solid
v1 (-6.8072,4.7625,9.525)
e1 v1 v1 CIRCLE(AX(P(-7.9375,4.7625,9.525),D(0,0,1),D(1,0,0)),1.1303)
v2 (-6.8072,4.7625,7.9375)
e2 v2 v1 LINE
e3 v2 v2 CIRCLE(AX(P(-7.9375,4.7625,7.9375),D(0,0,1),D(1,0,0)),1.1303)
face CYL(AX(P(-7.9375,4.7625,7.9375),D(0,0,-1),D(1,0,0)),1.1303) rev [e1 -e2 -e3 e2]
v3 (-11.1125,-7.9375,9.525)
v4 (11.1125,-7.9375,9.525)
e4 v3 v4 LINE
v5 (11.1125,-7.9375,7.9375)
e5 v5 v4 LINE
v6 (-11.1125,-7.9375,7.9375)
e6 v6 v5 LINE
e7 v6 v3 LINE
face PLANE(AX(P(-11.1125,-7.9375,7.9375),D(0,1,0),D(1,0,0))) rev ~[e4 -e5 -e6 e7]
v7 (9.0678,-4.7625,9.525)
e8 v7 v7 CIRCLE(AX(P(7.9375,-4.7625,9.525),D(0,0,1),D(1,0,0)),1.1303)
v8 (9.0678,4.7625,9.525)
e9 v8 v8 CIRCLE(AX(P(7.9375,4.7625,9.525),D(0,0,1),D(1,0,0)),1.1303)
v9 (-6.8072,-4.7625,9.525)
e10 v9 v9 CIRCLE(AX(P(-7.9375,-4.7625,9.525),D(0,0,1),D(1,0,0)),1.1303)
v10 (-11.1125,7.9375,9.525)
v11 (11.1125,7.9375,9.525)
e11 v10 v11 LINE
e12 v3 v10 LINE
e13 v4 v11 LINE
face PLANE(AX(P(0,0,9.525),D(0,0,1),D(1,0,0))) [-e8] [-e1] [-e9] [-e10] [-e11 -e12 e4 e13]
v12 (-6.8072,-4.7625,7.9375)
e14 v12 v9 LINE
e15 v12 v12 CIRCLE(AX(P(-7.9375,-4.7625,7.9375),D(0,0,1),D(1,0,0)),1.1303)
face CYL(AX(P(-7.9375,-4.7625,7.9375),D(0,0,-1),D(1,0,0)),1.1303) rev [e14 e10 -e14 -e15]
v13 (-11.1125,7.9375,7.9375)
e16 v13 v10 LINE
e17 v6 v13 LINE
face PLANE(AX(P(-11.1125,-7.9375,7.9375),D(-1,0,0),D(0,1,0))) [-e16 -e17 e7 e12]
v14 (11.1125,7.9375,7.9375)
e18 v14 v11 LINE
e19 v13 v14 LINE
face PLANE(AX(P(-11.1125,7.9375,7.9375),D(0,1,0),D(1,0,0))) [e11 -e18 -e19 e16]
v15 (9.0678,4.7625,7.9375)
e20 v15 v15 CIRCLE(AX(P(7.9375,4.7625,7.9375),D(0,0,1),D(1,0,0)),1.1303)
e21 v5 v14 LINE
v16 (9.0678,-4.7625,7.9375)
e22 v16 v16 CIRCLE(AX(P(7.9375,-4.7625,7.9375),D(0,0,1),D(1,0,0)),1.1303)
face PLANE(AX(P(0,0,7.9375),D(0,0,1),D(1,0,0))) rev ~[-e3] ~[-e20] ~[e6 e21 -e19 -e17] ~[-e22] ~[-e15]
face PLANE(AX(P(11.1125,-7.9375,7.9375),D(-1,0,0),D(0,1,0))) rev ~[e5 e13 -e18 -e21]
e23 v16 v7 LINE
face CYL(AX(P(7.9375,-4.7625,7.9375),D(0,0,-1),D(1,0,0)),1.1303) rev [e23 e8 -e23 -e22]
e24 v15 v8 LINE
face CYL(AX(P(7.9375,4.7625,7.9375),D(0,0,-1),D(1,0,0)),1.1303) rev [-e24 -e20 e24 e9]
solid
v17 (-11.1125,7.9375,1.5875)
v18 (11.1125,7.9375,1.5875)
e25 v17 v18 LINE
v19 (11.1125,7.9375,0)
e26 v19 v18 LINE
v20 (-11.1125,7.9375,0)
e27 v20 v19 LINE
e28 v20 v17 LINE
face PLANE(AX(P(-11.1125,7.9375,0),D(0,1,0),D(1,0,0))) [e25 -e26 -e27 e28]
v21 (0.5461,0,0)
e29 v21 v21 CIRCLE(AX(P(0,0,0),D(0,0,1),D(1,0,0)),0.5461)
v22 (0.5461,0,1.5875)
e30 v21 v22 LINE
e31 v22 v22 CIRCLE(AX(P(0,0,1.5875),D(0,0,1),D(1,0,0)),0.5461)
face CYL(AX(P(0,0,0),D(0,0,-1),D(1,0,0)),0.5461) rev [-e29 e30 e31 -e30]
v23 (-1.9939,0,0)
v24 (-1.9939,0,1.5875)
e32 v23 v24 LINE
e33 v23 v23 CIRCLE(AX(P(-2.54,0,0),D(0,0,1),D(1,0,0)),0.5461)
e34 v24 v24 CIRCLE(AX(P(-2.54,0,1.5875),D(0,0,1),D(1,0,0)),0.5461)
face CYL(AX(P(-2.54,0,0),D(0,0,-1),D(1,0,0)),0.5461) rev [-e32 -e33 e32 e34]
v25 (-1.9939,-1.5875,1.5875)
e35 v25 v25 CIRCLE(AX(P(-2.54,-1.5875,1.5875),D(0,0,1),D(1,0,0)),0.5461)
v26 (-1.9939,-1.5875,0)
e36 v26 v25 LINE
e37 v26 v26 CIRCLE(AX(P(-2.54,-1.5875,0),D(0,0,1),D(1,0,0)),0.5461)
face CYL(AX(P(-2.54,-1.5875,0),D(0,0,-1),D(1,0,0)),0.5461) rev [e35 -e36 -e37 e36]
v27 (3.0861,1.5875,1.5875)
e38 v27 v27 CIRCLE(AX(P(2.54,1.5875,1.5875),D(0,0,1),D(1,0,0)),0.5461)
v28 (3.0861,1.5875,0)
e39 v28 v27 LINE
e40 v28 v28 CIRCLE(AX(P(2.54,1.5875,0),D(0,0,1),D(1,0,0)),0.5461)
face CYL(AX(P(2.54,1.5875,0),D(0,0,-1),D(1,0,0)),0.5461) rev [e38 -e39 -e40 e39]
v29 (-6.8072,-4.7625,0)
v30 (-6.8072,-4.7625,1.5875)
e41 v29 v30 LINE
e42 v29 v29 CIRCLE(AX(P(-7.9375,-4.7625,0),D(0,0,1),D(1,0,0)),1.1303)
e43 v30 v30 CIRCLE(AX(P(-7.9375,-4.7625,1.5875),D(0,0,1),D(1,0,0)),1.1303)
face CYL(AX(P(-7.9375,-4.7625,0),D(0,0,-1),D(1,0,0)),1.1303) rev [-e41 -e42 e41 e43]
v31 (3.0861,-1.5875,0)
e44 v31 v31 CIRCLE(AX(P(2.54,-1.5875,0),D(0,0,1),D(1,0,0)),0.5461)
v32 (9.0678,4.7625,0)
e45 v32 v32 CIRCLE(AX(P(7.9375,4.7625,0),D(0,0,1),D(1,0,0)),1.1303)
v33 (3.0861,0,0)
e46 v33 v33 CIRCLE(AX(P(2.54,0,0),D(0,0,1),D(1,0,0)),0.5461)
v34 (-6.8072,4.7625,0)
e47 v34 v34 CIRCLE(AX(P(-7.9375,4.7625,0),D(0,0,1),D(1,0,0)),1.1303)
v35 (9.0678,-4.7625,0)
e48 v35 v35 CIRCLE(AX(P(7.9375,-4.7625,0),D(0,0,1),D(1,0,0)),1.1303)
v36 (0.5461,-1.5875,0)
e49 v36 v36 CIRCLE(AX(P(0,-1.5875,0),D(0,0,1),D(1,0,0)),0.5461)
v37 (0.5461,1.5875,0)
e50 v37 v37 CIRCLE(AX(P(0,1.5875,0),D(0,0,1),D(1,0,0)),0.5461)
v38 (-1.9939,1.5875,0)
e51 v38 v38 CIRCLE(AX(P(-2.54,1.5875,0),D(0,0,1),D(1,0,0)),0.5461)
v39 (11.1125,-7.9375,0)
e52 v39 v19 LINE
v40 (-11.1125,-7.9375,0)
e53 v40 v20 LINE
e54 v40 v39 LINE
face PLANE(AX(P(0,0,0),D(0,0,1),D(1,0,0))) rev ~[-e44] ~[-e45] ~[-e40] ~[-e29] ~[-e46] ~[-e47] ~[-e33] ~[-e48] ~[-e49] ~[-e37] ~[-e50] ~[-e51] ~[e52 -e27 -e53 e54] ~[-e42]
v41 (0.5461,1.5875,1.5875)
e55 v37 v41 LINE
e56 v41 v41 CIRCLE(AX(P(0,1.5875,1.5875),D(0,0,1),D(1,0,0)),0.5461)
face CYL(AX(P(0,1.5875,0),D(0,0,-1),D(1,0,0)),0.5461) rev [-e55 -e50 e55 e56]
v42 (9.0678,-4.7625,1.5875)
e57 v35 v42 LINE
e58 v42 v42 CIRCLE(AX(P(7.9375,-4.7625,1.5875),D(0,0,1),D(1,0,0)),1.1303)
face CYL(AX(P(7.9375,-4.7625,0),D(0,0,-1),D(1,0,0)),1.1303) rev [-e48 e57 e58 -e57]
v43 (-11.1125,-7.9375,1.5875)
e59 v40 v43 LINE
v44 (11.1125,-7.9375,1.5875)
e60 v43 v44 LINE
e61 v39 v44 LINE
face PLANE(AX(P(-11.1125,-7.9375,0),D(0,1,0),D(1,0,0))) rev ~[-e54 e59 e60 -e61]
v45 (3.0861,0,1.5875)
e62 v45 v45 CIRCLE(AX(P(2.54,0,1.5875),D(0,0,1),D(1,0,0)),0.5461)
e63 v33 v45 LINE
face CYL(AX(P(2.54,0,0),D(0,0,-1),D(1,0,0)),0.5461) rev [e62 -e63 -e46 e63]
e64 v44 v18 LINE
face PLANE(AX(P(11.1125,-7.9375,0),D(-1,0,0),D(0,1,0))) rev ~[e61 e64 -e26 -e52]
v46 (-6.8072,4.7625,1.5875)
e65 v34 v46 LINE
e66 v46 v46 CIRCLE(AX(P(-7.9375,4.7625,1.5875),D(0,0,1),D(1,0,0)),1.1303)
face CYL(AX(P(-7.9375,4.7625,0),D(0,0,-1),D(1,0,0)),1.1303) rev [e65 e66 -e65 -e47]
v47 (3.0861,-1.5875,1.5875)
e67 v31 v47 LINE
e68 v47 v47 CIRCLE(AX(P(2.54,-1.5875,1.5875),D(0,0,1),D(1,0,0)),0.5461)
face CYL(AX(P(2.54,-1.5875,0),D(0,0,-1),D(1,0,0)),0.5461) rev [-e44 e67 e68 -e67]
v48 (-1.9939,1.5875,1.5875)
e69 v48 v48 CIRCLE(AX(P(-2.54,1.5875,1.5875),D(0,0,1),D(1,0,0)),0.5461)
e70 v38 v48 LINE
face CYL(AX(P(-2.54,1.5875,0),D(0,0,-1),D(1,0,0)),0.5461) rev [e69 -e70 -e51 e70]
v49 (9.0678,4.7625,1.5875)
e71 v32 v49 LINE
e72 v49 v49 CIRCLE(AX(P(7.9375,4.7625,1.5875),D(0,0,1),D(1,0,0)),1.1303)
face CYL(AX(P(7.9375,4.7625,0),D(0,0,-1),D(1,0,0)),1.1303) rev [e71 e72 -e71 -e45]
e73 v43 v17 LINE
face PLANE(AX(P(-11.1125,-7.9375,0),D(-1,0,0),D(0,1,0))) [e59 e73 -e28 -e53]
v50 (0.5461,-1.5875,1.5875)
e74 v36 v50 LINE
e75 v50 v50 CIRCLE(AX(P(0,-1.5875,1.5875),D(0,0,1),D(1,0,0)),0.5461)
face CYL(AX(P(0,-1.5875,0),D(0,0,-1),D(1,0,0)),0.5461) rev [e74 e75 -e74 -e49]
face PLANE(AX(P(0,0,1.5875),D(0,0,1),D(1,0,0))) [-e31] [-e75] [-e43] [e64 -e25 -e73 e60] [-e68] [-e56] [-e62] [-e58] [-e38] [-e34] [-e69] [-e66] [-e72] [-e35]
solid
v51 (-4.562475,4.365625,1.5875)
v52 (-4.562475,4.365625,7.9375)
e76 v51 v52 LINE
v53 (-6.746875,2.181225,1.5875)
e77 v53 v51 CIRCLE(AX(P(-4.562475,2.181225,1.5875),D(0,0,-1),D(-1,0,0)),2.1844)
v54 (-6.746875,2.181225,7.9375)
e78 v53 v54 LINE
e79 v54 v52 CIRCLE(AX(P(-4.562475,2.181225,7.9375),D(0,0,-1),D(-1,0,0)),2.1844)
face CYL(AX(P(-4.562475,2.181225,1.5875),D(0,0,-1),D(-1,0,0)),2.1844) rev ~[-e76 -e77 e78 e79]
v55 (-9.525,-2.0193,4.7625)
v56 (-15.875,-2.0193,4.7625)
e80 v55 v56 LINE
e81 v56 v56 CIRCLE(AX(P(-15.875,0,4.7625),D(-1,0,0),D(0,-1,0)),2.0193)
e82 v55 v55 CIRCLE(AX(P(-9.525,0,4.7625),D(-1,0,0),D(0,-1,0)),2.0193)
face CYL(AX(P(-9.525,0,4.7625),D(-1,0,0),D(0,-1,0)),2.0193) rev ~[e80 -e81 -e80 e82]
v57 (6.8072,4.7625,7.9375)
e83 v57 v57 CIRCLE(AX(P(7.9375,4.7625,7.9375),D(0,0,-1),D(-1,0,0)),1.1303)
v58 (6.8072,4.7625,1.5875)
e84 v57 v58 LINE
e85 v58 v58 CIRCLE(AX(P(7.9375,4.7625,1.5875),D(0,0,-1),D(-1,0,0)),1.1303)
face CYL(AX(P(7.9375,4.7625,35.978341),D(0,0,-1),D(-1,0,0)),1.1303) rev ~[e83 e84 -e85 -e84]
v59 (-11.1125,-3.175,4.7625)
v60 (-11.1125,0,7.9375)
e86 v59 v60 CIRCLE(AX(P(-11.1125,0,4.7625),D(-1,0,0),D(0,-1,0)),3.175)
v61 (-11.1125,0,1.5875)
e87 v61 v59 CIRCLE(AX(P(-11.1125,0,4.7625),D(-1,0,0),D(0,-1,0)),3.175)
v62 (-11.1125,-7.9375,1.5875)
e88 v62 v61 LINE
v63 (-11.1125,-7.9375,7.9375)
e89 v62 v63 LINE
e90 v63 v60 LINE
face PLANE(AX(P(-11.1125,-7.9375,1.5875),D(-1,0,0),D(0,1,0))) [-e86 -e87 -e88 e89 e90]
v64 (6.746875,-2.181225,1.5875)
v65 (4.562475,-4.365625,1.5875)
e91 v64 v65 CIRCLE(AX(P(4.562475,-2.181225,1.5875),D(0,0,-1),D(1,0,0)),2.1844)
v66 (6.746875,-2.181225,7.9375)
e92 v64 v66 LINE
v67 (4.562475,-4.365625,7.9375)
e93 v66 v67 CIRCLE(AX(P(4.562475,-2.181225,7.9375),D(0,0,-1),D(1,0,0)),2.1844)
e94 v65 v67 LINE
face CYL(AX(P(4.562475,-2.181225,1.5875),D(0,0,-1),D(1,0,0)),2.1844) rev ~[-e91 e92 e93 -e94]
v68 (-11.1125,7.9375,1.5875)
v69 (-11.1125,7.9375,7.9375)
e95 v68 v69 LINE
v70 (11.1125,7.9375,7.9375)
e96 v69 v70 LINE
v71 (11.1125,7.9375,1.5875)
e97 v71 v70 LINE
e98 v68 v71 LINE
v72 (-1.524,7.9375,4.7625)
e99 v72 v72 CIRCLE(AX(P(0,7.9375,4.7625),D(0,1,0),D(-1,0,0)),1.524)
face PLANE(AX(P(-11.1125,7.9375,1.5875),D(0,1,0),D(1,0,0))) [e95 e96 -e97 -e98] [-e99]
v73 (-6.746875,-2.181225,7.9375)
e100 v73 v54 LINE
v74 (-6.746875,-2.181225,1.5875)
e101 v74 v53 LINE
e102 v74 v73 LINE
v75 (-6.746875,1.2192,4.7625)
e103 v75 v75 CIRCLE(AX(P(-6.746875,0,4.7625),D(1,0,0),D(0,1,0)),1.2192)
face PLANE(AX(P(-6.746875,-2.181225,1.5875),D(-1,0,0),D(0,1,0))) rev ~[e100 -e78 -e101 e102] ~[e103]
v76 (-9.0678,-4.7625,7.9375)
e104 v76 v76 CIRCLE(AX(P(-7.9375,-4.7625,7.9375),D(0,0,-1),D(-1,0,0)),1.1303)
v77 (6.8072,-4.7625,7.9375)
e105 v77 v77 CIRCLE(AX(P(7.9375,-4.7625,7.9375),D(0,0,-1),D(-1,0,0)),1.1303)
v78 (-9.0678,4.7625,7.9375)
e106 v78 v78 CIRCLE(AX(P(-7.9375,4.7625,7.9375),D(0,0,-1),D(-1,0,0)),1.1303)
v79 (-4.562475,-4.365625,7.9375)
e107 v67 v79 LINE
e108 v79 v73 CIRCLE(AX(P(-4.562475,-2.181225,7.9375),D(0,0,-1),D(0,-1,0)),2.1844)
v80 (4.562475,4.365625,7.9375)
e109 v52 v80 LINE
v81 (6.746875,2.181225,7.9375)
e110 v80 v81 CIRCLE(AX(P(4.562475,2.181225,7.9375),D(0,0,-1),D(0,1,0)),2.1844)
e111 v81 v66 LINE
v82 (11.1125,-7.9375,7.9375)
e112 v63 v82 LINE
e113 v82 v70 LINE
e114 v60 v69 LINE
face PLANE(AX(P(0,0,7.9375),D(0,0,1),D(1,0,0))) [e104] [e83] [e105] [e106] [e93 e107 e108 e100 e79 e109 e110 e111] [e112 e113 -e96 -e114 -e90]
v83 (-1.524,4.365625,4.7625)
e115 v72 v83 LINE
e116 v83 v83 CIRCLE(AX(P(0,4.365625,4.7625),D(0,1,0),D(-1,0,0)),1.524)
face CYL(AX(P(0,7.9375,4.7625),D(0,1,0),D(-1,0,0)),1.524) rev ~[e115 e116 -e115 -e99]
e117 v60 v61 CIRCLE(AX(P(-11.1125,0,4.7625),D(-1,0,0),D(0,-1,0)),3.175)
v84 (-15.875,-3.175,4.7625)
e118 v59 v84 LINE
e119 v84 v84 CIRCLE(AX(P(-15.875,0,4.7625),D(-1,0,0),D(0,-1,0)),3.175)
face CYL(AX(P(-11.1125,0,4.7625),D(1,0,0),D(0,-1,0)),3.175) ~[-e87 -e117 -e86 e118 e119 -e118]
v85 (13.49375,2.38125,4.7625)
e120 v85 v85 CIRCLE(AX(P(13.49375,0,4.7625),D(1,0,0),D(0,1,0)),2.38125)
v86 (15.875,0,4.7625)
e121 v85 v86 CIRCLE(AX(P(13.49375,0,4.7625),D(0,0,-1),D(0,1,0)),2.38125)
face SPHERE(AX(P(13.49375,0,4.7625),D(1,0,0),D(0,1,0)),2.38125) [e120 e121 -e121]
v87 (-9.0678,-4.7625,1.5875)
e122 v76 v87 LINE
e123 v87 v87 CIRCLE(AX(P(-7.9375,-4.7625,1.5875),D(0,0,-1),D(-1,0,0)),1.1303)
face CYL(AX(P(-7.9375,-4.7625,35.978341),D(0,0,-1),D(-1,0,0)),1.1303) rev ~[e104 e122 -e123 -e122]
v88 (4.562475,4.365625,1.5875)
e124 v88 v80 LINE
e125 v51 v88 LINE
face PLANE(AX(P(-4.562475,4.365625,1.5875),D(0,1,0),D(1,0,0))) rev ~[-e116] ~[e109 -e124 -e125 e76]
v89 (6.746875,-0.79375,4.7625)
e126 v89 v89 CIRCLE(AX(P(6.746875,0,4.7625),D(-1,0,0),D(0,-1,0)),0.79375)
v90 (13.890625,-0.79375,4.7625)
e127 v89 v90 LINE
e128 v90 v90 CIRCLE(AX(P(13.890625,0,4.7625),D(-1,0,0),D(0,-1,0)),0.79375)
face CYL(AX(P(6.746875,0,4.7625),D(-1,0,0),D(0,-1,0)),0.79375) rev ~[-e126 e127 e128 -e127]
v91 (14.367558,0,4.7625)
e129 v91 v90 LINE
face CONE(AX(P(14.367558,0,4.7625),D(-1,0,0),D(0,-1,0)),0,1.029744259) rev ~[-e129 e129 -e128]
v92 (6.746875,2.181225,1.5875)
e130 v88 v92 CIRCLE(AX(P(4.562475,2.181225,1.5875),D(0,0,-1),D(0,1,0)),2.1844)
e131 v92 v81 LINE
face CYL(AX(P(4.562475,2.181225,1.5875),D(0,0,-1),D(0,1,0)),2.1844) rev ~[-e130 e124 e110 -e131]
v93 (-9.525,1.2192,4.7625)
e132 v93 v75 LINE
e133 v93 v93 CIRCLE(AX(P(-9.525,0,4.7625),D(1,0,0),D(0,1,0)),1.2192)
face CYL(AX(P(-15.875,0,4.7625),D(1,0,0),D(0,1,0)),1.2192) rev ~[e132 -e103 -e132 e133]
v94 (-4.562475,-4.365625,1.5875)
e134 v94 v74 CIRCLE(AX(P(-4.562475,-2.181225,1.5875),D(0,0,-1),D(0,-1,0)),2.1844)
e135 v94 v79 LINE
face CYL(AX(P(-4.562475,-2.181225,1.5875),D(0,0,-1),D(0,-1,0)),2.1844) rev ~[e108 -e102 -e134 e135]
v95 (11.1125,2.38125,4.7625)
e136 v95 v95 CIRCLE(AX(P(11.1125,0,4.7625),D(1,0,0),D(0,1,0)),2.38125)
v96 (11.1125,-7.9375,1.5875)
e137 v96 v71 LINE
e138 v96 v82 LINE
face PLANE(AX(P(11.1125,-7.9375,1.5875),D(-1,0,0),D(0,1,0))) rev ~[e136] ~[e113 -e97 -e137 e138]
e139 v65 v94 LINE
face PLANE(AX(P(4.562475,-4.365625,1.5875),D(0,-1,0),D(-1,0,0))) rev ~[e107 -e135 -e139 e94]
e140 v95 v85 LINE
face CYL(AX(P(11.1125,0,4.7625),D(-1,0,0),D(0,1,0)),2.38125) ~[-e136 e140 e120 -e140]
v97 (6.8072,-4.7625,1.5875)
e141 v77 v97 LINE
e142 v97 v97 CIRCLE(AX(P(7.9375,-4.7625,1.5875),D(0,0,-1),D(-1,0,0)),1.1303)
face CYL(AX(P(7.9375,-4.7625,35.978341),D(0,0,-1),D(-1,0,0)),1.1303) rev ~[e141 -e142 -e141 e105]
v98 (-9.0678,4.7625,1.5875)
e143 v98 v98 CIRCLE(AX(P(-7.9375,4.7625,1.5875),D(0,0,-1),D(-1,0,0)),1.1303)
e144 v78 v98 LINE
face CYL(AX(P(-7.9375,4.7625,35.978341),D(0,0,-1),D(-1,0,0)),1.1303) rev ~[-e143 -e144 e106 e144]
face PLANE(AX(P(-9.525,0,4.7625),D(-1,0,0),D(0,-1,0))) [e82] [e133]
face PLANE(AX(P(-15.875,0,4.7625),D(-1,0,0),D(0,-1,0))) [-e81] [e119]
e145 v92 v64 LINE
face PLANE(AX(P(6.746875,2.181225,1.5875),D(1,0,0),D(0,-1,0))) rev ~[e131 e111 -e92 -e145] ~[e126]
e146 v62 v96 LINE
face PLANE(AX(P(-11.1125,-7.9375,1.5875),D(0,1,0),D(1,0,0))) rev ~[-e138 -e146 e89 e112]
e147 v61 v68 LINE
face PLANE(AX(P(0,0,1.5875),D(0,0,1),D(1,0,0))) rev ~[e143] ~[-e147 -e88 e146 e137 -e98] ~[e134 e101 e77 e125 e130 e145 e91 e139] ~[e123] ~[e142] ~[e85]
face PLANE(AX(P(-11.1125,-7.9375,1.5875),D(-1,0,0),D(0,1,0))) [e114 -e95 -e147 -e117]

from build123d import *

# Parameters (mm, degrees)
F0_W            = 22.225
F0_H            = 15.875
F1_DEPTH        = 6.35
F3_D            = 2.2606
F4_R            = 3.175
F5_DEPTH        = 4.7625
F7_R            = 2.38125
F8_DEPTH        = 4.7625
F9_R            = 2.38125
F12_D           = 1.5875
F12_DEPTH       = 7.14375
F12_TIP         = 0.4769331164
F14_D           = 2.4384
F14_DEPTH       = 11.1125
F14_CBORE_D     = 4.0386
F14_CBORE_DEPTH = 6.35
F14_TIP         = 0.7325692667
F15_R           = 1.524
F16_DEPTH       = 3.571875
F18_W           = 22.225
F18_H           = 15.875
F18_R           = 1.1303
F18_R_2         = 0.5461
F19_DEPTH       = 1.5875
F21_W           = 22.225
F21_H           = 15.875
F21_R           = 1.1303
F22_DEPTH       = 1.5875


with BuildPart() as f1:
    # F0 (on Top) → F1 (new body)
    with BuildSketch(Plane.XY):
        Rectangle(F0_W, F0_H)
        with BuildLine():
            ThreePointArc((-6.746875, 2.181225), (-6.1070790528, 3.7258290528), (-4.562475, 4.365625))
            Line((-4.562475, 4.365625), (4.562475, 4.365625))
            ThreePointArc((4.562475, 4.365625), (6.1070790528, 3.7258290528), (6.746875, 2.181225))
            Line((6.746875, 2.181225), (6.746875, -2.181225))
            ThreePointArc((6.746875, -2.181225), (6.1070790528, -3.7258290528), (4.562475, -4.365625))
            Line((4.562475, -4.365625), (-4.562475, -4.365625))
            ThreePointArc((-4.562475, -4.365625), (-6.1070790528, -3.7258290528), (-6.746875, -2.181225))
            Line((-6.746875, -2.181225), (-6.746875, 2.181225))
        make_face(mode=Mode.SUBTRACT)
    extrude(amount=F1_DEPTH)

    # F3 (through all)
    with Locations(Plane.XY.offset(6.35)):
        with Locations((-7.9375, 4.7625), (7.9375, 4.7625), (7.9375, -4.7625), (-7.9375, -4.7625)):
            Hole(F3_D / 2)

    # F4 (on face) → F5 (join)
    with BuildSketch(Plane(origin=(-11.1125, 0, 0), x_dir=(0, -1, 0), z_dir=(-1, 0, 0))):
        with Locations((0, 3.175)):
            Circle(F4_R)
    extrude(amount=F5_DEPTH)

    # F7 (on face) → F8 (join)
    with BuildSketch(Plane.YZ.offset(11.1125)):
        with Locations((0, 3.175)):
            Circle(F7_R)
    extrude(amount=F8_DEPTH)

    # F9
    f9_edges = [f1.edges().sort_by_distance(p)[0] for p in [
        (15.875, -2.38125, 3.175),
    ]]
    fillet(f9_edges, radius=F9_R)

    # F12 (one way)
    with BuildSketch(Plane(origin=(6.746875, 0, 0), x_dir=(0, -1, 0), z_dir=(-1, 0, 0))):
        with Locations((0, 3.175)):
            Circle(F12_D / 2)
    extrude(amount=-F12_DEPTH, mode=Mode.SUBTRACT)
    with Locations(Plane(origin=(6.746875, 0, 0), x_dir=(0, -1, 0), z_dir=(-1, 0, 0))):
        with Locations((0, 3.175)):
            with Locations((0, 0, -(F12_DEPTH + F12_TIP / 2))):  # 118° drill point
                Cone(0, F12_D / 2, F12_TIP, mode=Mode.SUBTRACT)

    # F14
    with Locations(Plane(origin=(-15.875, 0, 0), x_dir=(0, -1, 0), z_dir=(-1, 0, 0))):
        with Locations((0, 3.175)):
            CounterBoreHole(F14_D / 2, F14_CBORE_D / 2, F14_CBORE_DEPTH, depth=F14_DEPTH)
            with Locations((0, 0, -(F14_DEPTH + F14_TIP / 2))):  # 118° drill point
                Cone(0, F14_D / 2, F14_TIP, mode=Mode.SUBTRACT)

    # F15 (on face) → F16 (cut, through all)
    with BuildSketch(Plane(origin=(0, 7.9375, 0), x_dir=(-1, 0, 0), z_dir=(0, 1, 0))):
        with Locations((0, 3.175)):
            Circle(F15_R)
    extrude(amount=-F16_DEPTH, mode=Mode.SUBTRACT)


with BuildPart() as f1_1:
    # F17: moved
    add(f1.part.moved(Location((0, 0, 1.5875))))


with BuildPart() as f19:
    # F18 (on Top) → F19 (new body)
    with BuildSketch(Plane.XY):
        Rectangle(F18_W, F18_H)
        with Locations((-7.9375, -4.7625)):
            Circle(F18_R, mode=Mode.SUBTRACT)
        with Locations((-2.54, -1.5875)):
            Circle(F18_R_2, mode=Mode.SUBTRACT)
        with Locations((7.9375, -4.7625)):
            Circle(F18_R, mode=Mode.SUBTRACT)
        with Locations((0, -1.5875)):
            Circle(F18_R_2, mode=Mode.SUBTRACT)
        with Locations((2.54, -1.5875)):
            Circle(F18_R_2, mode=Mode.SUBTRACT)
        with Locations((-2.54, 0)):
            Circle(F18_R_2, mode=Mode.SUBTRACT)
        with Locations((-2.54, 1.5875)):
            Circle(F18_R_2, mode=Mode.SUBTRACT)
        with Locations((-7.9375, 4.7625)):
            Circle(F18_R, mode=Mode.SUBTRACT)
        Circle(F18_R_2, mode=Mode.SUBTRACT)
        with Locations((2.54, 0)):
            Circle(F18_R_2, mode=Mode.SUBTRACT)
        with Locations((0, 1.5875)):
            Circle(F18_R_2, mode=Mode.SUBTRACT)
        with Locations((2.54, 1.5875)):
            Circle(F18_R_2, mode=Mode.SUBTRACT)
        with Locations((7.9375, 4.7625)):
            Circle(F18_R, mode=Mode.SUBTRACT)
    extrude(amount=F19_DEPTH)


with BuildPart() as f22:
    # F21 (on offset) → F22 (new body)
    with BuildSketch(Plane.XY.offset(7.9375)):
        Rectangle(F21_W, F21_H)
        with Locations((-7.9375, -4.7625)):
            Circle(F21_R, mode=Mode.SUBTRACT)
        with Locations((7.9375, -4.7625)):
            Circle(F21_R, mode=Mode.SUBTRACT)
        with Locations((-7.9375, 4.7625)):
            Circle(F21_R, mode=Mode.SUBTRACT)
        with Locations((7.9375, 4.7625)):
            Circle(F21_R, mode=Mode.SUBTRACT)
    extrude(amount=F22_DEPTH)


solid = Compound([f1_1.part, f19.part, f22.part])
